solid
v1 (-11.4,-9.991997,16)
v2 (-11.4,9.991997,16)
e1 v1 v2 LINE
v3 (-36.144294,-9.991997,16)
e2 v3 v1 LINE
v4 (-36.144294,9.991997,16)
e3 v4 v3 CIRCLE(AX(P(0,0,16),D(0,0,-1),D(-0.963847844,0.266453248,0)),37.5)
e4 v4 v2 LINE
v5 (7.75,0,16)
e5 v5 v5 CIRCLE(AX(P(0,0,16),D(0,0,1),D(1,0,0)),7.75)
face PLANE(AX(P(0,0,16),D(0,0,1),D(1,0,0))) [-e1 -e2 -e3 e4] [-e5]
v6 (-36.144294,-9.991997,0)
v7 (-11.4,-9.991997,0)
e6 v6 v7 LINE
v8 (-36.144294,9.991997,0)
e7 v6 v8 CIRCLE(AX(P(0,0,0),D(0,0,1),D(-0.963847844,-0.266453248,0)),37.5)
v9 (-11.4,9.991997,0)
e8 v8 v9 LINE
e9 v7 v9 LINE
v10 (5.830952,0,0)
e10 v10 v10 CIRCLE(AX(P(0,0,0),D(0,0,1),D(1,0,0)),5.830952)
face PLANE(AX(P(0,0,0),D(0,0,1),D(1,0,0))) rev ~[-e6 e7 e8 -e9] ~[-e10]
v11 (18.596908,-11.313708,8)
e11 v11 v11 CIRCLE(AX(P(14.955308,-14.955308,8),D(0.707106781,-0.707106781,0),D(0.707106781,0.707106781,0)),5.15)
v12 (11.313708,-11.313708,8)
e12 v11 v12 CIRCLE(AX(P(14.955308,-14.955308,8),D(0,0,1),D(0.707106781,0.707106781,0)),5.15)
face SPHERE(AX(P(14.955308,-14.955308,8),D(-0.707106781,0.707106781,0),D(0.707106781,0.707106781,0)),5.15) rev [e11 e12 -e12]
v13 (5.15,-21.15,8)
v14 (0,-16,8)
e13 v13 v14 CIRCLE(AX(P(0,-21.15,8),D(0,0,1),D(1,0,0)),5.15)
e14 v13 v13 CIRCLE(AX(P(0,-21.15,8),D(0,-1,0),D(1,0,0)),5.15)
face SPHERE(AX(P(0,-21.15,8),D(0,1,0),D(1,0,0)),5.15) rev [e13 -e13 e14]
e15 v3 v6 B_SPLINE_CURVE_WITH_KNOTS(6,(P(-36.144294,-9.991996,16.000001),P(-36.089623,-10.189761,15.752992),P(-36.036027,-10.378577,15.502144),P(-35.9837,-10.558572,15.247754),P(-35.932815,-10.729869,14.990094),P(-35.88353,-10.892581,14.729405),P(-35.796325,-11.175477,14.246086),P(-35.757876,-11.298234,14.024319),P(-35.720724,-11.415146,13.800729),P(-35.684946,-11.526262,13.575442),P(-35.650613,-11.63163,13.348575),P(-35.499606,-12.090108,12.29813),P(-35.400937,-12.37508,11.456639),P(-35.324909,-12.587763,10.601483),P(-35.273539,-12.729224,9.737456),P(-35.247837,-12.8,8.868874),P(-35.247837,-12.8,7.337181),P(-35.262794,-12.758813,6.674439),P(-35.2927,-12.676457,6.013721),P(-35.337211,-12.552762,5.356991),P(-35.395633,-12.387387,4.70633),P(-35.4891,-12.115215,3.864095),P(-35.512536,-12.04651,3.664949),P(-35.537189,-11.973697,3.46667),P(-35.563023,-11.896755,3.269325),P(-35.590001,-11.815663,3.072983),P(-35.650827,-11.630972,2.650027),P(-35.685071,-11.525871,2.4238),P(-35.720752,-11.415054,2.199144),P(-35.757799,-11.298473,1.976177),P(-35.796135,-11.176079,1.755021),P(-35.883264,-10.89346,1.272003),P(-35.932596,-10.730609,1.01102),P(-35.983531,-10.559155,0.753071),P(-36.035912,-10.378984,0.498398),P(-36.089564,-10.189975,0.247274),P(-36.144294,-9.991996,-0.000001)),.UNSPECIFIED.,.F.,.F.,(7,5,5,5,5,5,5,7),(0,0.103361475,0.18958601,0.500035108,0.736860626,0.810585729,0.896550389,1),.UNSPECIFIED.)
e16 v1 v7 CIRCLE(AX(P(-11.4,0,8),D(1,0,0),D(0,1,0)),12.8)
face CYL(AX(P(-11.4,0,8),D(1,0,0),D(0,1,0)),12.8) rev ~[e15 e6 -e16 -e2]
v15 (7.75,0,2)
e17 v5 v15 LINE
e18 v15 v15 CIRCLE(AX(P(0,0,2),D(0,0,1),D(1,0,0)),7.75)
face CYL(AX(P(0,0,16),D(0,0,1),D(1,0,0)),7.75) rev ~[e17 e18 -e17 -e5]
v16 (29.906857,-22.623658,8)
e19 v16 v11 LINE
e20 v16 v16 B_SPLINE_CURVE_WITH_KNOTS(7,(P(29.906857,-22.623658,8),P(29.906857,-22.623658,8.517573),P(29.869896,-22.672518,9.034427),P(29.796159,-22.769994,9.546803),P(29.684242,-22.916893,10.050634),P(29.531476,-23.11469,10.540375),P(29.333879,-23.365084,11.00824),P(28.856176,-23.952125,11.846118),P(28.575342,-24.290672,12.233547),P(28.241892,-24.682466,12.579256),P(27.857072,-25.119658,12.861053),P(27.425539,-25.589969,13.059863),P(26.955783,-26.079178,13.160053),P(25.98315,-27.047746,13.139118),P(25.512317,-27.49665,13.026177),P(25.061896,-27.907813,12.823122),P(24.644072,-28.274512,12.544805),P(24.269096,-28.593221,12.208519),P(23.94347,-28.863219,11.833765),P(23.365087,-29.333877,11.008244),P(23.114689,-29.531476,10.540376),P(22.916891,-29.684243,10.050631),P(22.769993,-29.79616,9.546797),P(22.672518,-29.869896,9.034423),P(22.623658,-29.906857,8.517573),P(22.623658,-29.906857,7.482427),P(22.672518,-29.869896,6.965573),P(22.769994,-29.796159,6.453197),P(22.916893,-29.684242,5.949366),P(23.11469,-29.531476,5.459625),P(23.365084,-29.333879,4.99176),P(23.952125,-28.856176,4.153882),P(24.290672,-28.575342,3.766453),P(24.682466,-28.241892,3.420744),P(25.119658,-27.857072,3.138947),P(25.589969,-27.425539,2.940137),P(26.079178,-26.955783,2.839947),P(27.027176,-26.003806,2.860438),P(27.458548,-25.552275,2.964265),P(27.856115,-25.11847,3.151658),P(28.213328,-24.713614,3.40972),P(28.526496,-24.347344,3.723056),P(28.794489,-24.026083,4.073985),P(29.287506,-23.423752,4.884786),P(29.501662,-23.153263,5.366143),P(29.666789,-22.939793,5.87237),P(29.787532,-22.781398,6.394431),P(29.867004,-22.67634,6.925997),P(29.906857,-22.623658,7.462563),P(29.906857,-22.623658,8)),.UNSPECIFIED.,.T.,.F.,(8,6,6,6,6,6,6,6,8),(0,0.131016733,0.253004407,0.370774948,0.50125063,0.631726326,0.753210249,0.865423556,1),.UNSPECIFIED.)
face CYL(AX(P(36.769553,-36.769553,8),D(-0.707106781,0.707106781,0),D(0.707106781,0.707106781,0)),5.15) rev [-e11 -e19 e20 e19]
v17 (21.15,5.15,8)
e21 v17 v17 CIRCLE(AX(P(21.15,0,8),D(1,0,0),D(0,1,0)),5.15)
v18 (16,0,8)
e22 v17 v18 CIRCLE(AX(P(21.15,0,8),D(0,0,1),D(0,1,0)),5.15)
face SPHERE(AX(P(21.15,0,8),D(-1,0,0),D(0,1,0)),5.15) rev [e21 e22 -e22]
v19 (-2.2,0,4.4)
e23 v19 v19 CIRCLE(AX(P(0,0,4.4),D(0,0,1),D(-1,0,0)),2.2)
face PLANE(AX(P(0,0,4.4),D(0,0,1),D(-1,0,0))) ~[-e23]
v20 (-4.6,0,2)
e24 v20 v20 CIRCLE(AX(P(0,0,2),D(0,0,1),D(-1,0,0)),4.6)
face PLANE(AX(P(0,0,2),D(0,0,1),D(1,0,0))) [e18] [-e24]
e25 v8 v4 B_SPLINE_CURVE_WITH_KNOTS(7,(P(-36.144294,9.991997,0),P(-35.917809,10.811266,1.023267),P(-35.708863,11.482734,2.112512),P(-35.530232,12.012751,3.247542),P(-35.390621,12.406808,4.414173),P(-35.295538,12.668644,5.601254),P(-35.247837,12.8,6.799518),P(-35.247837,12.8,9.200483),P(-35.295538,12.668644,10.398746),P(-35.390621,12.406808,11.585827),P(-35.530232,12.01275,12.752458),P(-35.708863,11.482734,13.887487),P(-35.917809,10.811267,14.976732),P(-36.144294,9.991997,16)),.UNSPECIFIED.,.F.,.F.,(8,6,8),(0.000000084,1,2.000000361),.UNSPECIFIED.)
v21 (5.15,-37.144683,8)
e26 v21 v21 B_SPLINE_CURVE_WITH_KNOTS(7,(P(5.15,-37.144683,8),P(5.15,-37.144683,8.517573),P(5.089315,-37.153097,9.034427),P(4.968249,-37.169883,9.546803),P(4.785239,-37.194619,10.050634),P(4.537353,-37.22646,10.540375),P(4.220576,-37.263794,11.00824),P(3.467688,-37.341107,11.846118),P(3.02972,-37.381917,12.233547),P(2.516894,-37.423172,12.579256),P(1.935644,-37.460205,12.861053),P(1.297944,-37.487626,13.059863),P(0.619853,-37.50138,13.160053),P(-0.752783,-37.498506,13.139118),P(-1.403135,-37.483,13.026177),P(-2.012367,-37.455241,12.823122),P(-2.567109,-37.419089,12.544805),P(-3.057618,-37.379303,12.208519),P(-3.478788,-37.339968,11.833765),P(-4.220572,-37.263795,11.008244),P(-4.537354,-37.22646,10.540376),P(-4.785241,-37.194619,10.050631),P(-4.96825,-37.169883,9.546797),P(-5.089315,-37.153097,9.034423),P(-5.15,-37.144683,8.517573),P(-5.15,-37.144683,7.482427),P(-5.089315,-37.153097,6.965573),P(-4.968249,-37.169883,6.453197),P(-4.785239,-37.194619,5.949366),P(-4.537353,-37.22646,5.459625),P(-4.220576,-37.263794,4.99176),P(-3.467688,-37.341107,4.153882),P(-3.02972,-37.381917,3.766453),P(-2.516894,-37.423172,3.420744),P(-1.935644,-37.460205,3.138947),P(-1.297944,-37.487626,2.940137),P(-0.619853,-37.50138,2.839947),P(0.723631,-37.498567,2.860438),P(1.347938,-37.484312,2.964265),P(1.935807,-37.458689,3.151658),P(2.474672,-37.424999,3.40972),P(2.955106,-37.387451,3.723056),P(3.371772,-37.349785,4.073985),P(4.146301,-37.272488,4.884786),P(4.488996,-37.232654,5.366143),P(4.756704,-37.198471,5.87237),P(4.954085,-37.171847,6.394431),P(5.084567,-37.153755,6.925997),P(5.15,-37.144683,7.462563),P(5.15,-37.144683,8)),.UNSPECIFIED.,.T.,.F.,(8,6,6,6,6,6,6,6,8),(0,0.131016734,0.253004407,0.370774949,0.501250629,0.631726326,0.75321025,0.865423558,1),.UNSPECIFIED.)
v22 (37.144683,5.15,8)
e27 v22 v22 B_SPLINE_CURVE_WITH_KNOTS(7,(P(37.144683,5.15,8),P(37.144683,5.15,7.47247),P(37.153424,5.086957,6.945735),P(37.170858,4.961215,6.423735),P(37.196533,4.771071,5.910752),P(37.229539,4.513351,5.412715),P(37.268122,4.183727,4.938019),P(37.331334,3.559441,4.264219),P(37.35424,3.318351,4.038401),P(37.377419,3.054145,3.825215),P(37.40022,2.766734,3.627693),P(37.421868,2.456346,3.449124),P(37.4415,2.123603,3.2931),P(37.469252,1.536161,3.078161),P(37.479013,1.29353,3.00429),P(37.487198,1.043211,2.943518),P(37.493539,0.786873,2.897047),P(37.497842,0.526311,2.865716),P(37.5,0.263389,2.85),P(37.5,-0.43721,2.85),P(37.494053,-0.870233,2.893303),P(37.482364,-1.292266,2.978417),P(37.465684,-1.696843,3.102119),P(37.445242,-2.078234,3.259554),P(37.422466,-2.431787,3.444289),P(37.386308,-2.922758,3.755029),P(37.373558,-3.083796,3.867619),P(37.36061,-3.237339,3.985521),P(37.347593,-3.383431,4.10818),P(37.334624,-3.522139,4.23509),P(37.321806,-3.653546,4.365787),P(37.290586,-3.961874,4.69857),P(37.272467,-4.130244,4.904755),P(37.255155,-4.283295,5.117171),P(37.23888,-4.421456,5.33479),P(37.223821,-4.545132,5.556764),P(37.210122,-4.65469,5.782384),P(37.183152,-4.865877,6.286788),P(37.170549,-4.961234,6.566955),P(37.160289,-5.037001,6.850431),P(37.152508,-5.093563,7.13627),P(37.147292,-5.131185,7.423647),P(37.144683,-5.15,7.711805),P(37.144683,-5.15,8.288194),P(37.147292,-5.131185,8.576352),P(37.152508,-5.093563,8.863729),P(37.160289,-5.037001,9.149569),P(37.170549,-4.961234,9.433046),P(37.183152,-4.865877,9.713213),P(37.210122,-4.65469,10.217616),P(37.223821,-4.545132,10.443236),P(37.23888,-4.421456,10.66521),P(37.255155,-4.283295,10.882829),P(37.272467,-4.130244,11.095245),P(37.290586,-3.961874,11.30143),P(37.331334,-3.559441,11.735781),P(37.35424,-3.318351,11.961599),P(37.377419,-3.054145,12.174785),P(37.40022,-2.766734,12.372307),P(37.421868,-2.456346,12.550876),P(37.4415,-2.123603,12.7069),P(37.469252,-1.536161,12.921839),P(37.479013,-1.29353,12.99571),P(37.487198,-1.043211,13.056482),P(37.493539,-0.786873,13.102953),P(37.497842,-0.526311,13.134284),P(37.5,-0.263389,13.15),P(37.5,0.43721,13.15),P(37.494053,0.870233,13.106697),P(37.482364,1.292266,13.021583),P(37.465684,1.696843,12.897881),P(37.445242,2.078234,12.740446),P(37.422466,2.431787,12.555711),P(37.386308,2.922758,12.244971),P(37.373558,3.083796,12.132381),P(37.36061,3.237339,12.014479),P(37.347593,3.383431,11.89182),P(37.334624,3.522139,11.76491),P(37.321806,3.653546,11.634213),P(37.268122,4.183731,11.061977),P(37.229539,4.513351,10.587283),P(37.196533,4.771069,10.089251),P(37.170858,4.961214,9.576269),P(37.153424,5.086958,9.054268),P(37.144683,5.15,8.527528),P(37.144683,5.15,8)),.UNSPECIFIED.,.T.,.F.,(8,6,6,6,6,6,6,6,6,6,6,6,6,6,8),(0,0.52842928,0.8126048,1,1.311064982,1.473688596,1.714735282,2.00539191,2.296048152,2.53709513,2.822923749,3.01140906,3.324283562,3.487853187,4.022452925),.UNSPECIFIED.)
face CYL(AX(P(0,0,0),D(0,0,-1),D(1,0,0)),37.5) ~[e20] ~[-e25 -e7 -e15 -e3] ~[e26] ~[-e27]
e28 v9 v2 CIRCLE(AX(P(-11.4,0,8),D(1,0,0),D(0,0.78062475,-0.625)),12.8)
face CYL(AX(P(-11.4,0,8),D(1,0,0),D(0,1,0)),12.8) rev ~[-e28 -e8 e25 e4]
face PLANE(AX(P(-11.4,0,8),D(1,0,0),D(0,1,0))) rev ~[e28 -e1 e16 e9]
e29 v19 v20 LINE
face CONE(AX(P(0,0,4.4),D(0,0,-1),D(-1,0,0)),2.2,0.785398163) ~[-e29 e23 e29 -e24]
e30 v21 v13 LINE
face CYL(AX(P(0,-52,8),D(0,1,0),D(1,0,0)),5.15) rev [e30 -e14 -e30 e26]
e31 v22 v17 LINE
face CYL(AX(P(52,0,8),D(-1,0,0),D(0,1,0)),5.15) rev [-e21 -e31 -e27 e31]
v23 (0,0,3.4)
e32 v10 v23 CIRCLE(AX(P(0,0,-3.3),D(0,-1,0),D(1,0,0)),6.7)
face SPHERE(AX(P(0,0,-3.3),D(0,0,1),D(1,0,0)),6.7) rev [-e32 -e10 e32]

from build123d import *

# Parameters (mm, degrees)
F0_R             = 37.5
F1_DEPTH         = 16
F3_START         = -11.4
F2_R             = 12.8
F3_DEPTH         = 28.6
F4_R             = 7.75
F5_DEPTH         = 14
F12_COPIES_COUNT = 3
F12_COPIES_ANGLE = 90


# Not quite as in the source:
# - a pattern or mirror of a feature is missing from the dataset's text; its kind, count and spacing are read off the source's solid


with BuildPart() as f1:
    # F0 (on Top) → F1 (new body)
    with BuildSketch(Plane.XY):
        Circle(F0_R)
    extrude(amount=F1_DEPTH)

    # F2 (on Right) → F3 (cut)
    with BuildSketch(Plane.YZ.offset(F3_START)):
        with Locations((0, 8)):
            Circle(F2_R)
    extrude(amount=-F3_DEPTH, mode=Mode.SUBTRACT)

    # F4 (on face) → F5 (cut)
    with BuildSketch(Plane.XY.offset(16)):
        Circle(F4_R)
    extrude(amount=-F5_DEPTH, mode=Mode.SUBTRACT)

    # F7 (on Front) → F8 (revolve)
    with BuildSketch(Plane.XZ):
        Polygon((0, 2), (0, 4.4), (-2.2, 4.4), (-4.6, 2), align=None)
    revolve(axis=Axis((0, 0, 3.2), (0, 0, 1)))

    # F9 (on Front) → F10 (revolve, cut)
    with BuildSketch(Plane.XZ):
        with BuildLine():
            ThreePointArc((0, -10), (4.7376154339, -8.0376154339), (6.7, -3.3))
            ThreePointArc((6.7, -3.3), (4.7376154339, 1.4376154339), (0, 3.4))
            Line((0, 3.4), (0, -10))
        make_face()
    revolve(axis=Axis((0, 0, -3.3), (0, 0, -1)), mode=Mode.SUBTRACT)

    # F11 (on offset) → F12 (revolve, cut)
    with BuildSketch(Plane.XY.offset(8)):
        with BuildLine():
            Line((16, 0), (52, 0))
            Line((52, 0), (52, 5.15))
            Line((52, 5.15), (21.15, 5.15))
            ThreePointArc((21.15, 5.15), (17.5084000769, 3.6415999231), (16, 0))
        make_face()
    f12 = revolve(axis=Axis((34, 0, 8), (1, 0, 0)), mode=Mode.SUBTRACT)

    # F12_copies: F12 ×3 about axis
    f12_copies_axis = Axis((0, 0, 0), (0, 0, -1))
    for i in range(1, F12_COPIES_COUNT):
        add(f12.rotate(f12_copies_axis, i * F12_COPIES_ANGLE / (F12_COPIES_COUNT - 1)), mode=Mode.SUBTRACT)


solid = f1.part
